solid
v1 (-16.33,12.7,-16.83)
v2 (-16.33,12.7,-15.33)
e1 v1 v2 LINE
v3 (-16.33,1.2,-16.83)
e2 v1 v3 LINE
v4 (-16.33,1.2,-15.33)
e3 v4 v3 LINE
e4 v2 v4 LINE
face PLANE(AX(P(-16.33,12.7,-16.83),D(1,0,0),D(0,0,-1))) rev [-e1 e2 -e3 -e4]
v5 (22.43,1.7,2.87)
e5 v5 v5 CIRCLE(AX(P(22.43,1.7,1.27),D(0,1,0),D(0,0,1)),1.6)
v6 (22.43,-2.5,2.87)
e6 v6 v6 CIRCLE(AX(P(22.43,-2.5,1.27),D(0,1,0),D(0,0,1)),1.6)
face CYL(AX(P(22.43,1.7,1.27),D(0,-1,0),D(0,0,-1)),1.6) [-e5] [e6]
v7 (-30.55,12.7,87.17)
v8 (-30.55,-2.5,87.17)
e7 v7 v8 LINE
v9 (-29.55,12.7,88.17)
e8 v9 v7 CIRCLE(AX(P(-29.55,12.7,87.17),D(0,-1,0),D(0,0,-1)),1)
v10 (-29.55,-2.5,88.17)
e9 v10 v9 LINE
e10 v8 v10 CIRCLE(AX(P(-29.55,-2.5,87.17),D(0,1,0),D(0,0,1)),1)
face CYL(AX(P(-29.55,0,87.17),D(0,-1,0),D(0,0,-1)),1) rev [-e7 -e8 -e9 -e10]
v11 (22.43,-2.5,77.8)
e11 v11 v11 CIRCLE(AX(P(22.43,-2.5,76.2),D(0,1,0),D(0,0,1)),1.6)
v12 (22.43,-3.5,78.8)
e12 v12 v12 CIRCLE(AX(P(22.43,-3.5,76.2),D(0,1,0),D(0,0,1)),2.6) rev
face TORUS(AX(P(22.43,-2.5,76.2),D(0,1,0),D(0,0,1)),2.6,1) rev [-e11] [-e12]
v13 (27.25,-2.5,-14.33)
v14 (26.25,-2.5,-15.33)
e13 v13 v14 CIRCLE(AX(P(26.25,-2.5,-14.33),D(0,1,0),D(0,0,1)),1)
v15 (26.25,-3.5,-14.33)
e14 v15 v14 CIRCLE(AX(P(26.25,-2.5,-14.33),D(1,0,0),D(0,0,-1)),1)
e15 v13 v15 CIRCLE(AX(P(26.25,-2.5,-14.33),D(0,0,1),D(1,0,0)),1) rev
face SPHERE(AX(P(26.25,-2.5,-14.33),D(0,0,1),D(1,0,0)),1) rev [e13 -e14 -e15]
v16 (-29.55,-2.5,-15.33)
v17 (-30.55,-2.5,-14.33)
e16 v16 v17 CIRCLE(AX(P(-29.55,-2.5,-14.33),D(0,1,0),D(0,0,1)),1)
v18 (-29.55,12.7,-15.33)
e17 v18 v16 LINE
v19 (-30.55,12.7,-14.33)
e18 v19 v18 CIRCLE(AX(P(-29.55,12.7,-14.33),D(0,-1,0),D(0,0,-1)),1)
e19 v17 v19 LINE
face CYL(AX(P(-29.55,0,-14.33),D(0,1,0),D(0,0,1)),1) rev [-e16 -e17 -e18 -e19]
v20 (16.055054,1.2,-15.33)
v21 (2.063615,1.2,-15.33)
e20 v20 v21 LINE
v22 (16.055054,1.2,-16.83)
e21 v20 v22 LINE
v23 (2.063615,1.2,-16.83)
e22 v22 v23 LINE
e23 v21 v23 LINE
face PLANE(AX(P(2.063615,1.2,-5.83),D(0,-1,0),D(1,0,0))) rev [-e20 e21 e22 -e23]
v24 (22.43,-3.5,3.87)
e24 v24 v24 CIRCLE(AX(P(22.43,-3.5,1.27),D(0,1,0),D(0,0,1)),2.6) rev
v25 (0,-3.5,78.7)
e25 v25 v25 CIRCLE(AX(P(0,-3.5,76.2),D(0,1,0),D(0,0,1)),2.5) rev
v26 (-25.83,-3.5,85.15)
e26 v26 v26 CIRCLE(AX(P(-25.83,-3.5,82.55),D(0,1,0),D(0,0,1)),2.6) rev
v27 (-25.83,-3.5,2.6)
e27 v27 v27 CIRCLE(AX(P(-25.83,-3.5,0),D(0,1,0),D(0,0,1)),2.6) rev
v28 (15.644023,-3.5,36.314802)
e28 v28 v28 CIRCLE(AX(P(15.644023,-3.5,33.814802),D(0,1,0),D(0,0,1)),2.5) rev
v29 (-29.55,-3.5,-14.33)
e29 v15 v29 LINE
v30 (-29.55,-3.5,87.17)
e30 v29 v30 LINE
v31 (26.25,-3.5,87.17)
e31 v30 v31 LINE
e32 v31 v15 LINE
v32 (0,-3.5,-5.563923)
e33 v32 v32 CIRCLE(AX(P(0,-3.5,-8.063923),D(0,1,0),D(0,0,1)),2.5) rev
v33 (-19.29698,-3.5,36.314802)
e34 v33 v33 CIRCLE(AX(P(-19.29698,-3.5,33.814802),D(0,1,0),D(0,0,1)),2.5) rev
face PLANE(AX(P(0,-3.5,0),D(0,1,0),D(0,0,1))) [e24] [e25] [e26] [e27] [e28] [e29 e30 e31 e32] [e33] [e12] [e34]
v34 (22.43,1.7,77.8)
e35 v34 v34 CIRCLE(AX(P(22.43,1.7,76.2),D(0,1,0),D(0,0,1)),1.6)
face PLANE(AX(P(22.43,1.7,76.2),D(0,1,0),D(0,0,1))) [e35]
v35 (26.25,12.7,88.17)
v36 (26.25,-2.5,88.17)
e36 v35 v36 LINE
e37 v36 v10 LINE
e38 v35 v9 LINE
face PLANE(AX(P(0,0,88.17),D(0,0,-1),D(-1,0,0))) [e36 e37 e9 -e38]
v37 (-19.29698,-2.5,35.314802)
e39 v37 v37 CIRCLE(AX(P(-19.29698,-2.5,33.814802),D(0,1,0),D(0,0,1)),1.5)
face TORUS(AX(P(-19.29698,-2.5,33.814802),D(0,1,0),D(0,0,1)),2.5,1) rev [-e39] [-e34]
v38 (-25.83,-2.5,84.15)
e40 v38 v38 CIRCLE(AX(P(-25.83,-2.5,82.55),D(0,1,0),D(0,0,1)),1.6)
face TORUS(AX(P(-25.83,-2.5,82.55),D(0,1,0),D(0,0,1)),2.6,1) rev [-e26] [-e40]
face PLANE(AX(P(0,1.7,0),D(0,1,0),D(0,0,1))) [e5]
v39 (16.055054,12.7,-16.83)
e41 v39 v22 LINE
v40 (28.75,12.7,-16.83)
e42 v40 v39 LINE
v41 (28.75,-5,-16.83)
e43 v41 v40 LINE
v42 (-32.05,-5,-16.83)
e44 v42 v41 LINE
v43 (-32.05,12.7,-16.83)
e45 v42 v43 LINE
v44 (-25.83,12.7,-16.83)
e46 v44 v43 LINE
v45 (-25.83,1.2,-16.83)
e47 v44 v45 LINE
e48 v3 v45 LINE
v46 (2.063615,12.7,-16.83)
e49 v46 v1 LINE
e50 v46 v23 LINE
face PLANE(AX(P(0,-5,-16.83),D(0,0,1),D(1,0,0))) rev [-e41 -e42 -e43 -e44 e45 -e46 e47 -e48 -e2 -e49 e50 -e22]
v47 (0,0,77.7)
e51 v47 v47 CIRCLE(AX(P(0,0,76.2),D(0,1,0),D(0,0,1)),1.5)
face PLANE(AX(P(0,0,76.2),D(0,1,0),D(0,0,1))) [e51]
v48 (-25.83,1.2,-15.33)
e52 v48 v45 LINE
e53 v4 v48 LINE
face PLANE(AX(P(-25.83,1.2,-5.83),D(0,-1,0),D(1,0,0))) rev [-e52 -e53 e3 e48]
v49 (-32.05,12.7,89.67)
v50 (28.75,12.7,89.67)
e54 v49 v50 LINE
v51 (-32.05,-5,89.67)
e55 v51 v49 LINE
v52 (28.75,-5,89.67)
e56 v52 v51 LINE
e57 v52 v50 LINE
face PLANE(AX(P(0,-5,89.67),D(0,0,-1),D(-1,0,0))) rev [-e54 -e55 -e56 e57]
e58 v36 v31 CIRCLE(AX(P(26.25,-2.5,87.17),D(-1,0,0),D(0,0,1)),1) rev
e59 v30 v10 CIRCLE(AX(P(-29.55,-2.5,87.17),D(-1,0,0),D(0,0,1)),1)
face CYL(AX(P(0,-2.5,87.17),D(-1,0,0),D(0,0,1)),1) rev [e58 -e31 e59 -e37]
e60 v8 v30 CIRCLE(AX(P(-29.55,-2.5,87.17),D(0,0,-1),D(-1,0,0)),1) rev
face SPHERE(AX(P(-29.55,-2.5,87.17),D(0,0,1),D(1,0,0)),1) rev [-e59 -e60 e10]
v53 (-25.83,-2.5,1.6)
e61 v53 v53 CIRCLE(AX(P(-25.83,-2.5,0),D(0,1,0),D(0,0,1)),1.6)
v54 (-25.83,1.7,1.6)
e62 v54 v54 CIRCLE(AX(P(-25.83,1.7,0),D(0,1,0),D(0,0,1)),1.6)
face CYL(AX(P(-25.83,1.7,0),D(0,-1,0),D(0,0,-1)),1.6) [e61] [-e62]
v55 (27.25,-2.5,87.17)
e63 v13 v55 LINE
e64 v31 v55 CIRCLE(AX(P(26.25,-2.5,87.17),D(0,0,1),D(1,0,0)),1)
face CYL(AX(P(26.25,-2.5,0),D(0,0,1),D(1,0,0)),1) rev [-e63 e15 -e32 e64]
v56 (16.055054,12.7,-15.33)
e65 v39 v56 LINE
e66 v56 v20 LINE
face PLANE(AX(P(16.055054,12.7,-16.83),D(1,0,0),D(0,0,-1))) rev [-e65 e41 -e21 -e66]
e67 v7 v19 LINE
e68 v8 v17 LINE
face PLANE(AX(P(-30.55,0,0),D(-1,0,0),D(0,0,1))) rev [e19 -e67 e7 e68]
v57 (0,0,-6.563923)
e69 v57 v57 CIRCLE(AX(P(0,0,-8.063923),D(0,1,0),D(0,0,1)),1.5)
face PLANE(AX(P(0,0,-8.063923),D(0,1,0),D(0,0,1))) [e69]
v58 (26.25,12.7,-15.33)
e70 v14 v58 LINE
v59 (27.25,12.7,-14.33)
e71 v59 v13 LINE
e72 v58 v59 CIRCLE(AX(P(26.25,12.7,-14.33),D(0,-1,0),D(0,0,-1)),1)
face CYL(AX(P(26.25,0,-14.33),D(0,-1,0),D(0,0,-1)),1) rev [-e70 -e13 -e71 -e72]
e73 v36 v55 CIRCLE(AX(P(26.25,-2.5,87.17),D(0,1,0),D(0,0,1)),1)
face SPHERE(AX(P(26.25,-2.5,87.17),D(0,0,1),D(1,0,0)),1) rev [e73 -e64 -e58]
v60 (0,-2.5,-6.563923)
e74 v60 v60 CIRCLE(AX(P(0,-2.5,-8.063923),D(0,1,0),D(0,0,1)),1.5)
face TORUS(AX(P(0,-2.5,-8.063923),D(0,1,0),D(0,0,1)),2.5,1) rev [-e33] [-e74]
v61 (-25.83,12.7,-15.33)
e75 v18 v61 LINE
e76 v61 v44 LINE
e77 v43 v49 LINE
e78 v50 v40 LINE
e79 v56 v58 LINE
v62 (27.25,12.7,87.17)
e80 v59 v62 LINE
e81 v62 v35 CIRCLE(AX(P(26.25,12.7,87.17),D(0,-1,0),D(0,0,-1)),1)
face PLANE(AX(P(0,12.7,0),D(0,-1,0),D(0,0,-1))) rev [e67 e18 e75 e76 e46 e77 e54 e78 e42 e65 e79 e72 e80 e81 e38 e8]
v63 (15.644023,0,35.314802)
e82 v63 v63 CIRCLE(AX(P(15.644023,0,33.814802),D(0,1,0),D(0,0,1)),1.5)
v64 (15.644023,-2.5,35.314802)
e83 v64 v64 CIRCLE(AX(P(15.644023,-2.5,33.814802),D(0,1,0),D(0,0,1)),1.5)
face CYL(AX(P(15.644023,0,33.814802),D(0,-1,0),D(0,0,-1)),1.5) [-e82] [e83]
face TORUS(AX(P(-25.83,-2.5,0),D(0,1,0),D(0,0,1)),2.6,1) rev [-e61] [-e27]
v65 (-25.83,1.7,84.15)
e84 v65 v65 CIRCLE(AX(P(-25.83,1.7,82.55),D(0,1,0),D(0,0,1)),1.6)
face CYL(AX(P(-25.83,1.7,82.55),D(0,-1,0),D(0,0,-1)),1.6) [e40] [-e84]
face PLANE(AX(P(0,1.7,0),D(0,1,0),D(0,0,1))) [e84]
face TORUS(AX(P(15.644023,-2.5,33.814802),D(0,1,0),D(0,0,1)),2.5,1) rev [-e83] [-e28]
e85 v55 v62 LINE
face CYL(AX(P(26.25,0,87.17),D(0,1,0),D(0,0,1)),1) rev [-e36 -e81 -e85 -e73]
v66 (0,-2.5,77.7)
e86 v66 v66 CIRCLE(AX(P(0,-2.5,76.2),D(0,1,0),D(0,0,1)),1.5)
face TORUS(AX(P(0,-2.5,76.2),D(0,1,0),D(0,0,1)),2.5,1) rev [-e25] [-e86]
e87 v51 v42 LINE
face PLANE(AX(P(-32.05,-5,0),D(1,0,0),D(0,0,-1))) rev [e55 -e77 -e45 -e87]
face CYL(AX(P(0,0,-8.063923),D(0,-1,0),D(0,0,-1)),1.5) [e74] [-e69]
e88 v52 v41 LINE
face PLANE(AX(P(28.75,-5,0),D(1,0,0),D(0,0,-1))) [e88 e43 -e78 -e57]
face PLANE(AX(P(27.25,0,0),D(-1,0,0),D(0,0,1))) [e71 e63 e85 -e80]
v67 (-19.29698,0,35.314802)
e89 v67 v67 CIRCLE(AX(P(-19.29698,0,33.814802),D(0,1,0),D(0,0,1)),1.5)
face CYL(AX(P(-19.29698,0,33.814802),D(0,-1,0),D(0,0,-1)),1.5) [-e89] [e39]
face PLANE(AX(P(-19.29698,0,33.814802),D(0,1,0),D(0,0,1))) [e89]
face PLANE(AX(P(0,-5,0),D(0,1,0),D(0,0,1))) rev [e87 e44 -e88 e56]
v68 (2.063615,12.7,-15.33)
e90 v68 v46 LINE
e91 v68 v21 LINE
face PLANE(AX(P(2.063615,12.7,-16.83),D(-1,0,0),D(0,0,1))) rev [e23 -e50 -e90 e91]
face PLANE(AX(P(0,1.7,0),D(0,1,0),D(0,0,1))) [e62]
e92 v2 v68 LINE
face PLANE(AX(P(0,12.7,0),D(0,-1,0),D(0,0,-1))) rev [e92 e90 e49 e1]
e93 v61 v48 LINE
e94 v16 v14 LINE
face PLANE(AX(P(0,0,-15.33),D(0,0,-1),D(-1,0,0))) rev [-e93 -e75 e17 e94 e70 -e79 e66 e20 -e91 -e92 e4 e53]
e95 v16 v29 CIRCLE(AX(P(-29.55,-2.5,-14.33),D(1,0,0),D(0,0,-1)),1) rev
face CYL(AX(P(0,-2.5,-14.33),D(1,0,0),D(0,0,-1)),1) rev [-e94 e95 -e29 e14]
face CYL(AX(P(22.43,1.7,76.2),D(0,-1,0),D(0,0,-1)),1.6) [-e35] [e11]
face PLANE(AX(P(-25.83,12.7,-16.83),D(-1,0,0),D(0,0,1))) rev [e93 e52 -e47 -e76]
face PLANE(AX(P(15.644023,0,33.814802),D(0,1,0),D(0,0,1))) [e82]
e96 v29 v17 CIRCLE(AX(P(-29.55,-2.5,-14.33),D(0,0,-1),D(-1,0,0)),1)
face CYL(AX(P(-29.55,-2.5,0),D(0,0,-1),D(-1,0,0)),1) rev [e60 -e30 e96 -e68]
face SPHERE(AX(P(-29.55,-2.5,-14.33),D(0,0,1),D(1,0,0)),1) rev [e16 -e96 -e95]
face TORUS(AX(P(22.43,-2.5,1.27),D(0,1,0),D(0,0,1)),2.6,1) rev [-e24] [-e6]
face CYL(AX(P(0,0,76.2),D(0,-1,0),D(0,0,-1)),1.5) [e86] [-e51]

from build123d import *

# Parameters (mm, degrees)
BOSS_EXTRUDE1_START = -3.5
SKETCH1_W           = 60.8
SKETCH1_H           = 106.5
BOSS_EXTRUDE1_DEPTH = 1.5
BOSS_EXTRUDE2_START = -3.5
BOSS_EXTRUDE2_DEPTH = 3.5
BOSS_EXTRUDE3_DEPTH = 1.7
SKETCH2_R           = 1.5
BOSS_EXTRUDE4_DEPTH = 3.5
BOSS_EXTRUDE5_START = -3.5
SKETCH1_7_R         = 1.6
BOSS_EXTRUDE5_DEPTH = 5.2
FILLET5_R           = 1
SKETCH3_W           = 18.393615341
SKETCH3_H           = 1.5
BOSS_EXTRUDE6_DEPTH = 11
SKETCH4_W           = 13.991439111
SKETCH4_H           = 0.5
SKETCH4_W_2         = 9.5
CUT_EXTRUDE1_DEPTH  = 11
FILLET6_R           = 1


with BuildPart() as part:
    # Sketch1 → Boss-Extrude1 (new body)
    with BuildSketch(Plane(origin=(0, 0, 0), x_dir=(1, 0, 0), z_dir=(0, 1, 0)).offset(BOSS_EXTRUDE1_START)):
        with Locations((-1.65, -36.42)):
            Rectangle(SKETCH1_W, SKETCH1_H)
    extrude(amount=-BOSS_EXTRUDE1_DEPTH)



with BuildPart() as body_2:
    # Sketch1<3> → Boss-Extrude2 (new body)
    with BuildSketch(Plane(origin=(0, 0, 0), x_dir=(1, 0, 0), z_dir=(0, 1, 0)).offset(BOSS_EXTRUDE2_START)):
        Polygon((-32.05, 16.83), (28.75, 16.83), (28.75, -89.67), (-2.2, -89.67), (-32.05, -89.67), align=None)
        Polygon((-30.55, -88.17), (-30.55, 15.33), (27.25, 15.33), (27.25, -88.17), (-2.2, -88.17), align=None, mode=Mode.SUBTRACT)
    extrude(amount=BOSS_EXTRUDE2_DEPTH)

    # Sketch1<5> → Boss-Extrude3 (add)
    with BuildSketch(Plane(origin=(0, 0, 0), x_dir=(1, 0, 0), z_dir=(0, 1, 0))):
        Polygon((-32.05, 16.83), (28.75, 16.83), (28.75, -89.67), (-2.2, -89.67), (-32.05, -89.67), align=None)
        Polygon((-30.55, -88.17), (-30.55, 15.33), (27.25, 15.33), (27.25, -88.17), (-2.2, -88.17), align=None, mode=Mode.SUBTRACT)
    extrude(amount=BOSS_EXTRUDE3_DEPTH)


with BuildPart() as part_1:
    add(part.part)

    add(body_2.part)  # Boss-Extrude4 merges body 2
    # Sketch2 → Boss-Extrude4 (add)
    with BuildSketch(Plane(origin=(0, -3.5, 0), x_dir=(1, 0, 0), z_dir=(0, 1, 0))):
        with Locations(Location((0, -76.2, 0), (0, 0, 270))):
            Circle(SKETCH2_R)
        with Locations(Location((-19.296980253, -33.814802094, 0), (0, 0, 270))):
            Circle(SKETCH2_R)
        with Locations(Location((15.644023456, -33.814802094, 0), (0, 0, 270))):
            Circle(SKETCH2_R)
        with Locations(Location((0, 8.063923473, 0), (0, 0, 270))):
            Circle(SKETCH2_R)
    extrude(amount=BOSS_EXTRUDE4_DEPTH)

    # Sketch1<7> → Boss-Extrude5 (add)
    with BuildSketch(Plane(origin=(0, 0, 0), x_dir=(1, 0, 0), z_dir=(0, 1, 0)).offset(BOSS_EXTRUDE5_START)):
        with Locations(Location((-25.83, 0, 0), (0, 0, 270))):
            Circle(SKETCH1_7_R)
        with Locations(Location((22.43, -1.27, 0), (0, 0, 270))):
            Circle(SKETCH1_7_R)
        with Locations(Location((-25.83, -82.55, 0), (0, 0, 270))):
            Circle(SKETCH1_7_R)
        with Locations(Location((22.43, -76.2, 0), (0, 0, 270))):
            Circle(SKETCH1_7_R)
    extrude(amount=BOSS_EXTRUDE5_DEPTH)

    # Fillet5
    fillet5_edges = [part_1.edges().sort_by_distance(p)[0] for p in [
        (0, -3.5, 74.7),
        (-30.55, -3.5, 36.42),
        (-1.65, -3.5, -15.33),
        (-1.65, -3.5, 88.17),
        (27.25, -3.5, 36.42),
        (-19.296980253, -3.5, 32.314802094),
        (15.644023456, -3.5, 32.314802094),
        (0, -3.5, -9.563923473),
        (-25.83, -3.5, -1.6),
        (22.43, -3.5, -0.33),
        (-25.83, -3.5, 80.95),
        (22.43, -3.5, 74.6),
    ]]
    fillet(fillet5_edges, radius=FILLET5_R)

    # Sketch3 → Boss-Extrude6 (add)
    with BuildSketch(Plane(origin=(0, 1.7, 0), x_dir=(1, 0, 0), z_dir=(0, 1, 0))):
        Polygon((-25.83, 16.83), (-32.05, 16.83), (-32.05, -89.67), (28.75, -89.67), (28.75, 16.83), (16.055054452, 16.83), (16.055054452, 15.33), (27.25, 15.33), (27.25, -88.17), (-30.55, -88.17), (-30.55, 15.33), (-25.83, 15.33), align=None)
        with Locations((-7.13319233, 16.08)):
            Rectangle(SKETCH3_W, SKETCH3_H)
    extrude(amount=BOSS_EXTRUDE6_DEPTH)

    # Sketch4 → Cut-Extrude1 (cut)
    with BuildSketch(Plane(origin=(0, 0, -16.83), x_dir=(-1, 0, 0), z_dir=(0, 0, -1))):
        with Locations((-9.059334897, 1.45)):
            Rectangle(SKETCH4_W, SKETCH4_H)
        with Locations((21.08, 1.45)):
            Rectangle(SKETCH4_W_2, SKETCH4_H)
    extrude(amount=-CUT_EXTRUDE1_DEPTH, mode=Mode.SUBTRACT)

    # Fillet6
    # the kernel refuses this fillet: 1 mm, written as the material it adds along each edge
    with BuildSketch(Plane(origin=(-29.55, -2.5, 87.17), x_dir=(-1, 0, 0), z_dir=(0, 0, 1))) as fillet6_piece_1_section:
        Polygon((0, 0), (FILLET6_R, 0), (FILLET6_R, FILLET6_R), (0, FILLET6_R), align=None)
    fillet6_piece_1 = extrude(amount=FILLET6_R, mode=Mode.PRIVATE)
    fillet6_piece_1 = fillet6_piece_1 - Plane(origin=(-29.55, -2.5, 87.17), x_dir=(0.7071067811865475, 0.7071067811865475, 0), z_dir=(0, 0, 1)) * Sphere(FILLET6_R, mode=Mode.PRIVATE)
    add(fillet6_piece_1)
    with BuildSketch(Plane(origin=(-29.55, -2.5, -14.33), x_dir=(-1, 0, 0), z_dir=(0, 0, -1))) as fillet6_piece_2_section:
        Polygon((0, 0), (FILLET6_R, 0), (FILLET6_R, -FILLET6_R), (0, -FILLET6_R), align=None)
    fillet6_piece_2 = extrude(amount=FILLET6_R, mode=Mode.PRIVATE)
    fillet6_piece_2 = fillet6_piece_2 - Plane(origin=(-29.55, -2.5, -14.33), x_dir=(0.7071067811865475, 0.7071067811865475, 0), z_dir=(0, 0, -1)) * Sphere(FILLET6_R, mode=Mode.PRIVATE)
    add(fillet6_piece_2)
    with BuildSketch(Plane(origin=(26.25, -2.5, 87.17), x_dir=(1, 0, 0), z_dir=(0, 0, 1))) as fillet6_piece_3_section:
        Polygon((0, 0), (FILLET6_R, 0), (FILLET6_R, -FILLET6_R), (0, -FILLET6_R), align=None)
    fillet6_piece_3 = extrude(amount=FILLET6_R, mode=Mode.PRIVATE)
    fillet6_piece_3 = fillet6_piece_3 - Plane(origin=(26.25, -2.5, 87.17), x_dir=(-0.7071067811865475, 0.7071067811865475, 0), z_dir=(0, 0, 1)) * Sphere(FILLET6_R, mode=Mode.PRIVATE)
    add(fillet6_piece_3)
    with BuildSketch(Plane(origin=(26.25, -2.5, -14.33), x_dir=(1, 0, 0), z_dir=(0, 0, -1))) as fillet6_piece_4_section:
        Polygon((0, 0), (FILLET6_R, 0), (FILLET6_R, FILLET6_R), (0, FILLET6_R), align=None)
    fillet6_piece_4 = extrude(amount=FILLET6_R, mode=Mode.PRIVATE)
    fillet6_piece_4 = fillet6_piece_4 - Plane(origin=(26.25, -2.5, -14.33), x_dir=(-0.7071067811865475, 0.7071067811865475, 0), z_dir=(0, 0, -1)) * Sphere(FILLET6_R, mode=Mode.PRIVATE)
    add(fillet6_piece_4)
    with BuildSketch(Plane(origin=(-30.55, -2.5, 88.17), x_dir=(1, 0, 0), z_dir=(0, 1, 0)), Plane(origin=(27.25, 12.7, 88.17), x_dir=(-1, 0, 0), z_dir=(0, -1, 0))) as fillet6_piece_5:
        with BuildLine():
            CenterArc((FILLET6_R, FILLET6_R), FILLET6_R, 180, 90)
            Line((0, FILLET6_R), (0, 0))
            Line((0, 0), (FILLET6_R, 0))
        make_face()
    extrude(amount=15.2)
    with BuildSketch(Plane(origin=(-30.55, -2.5, -15.33), x_dir=(1, 0, 0), z_dir=(0, 1, 0)), Plane(origin=(27.25, 12.7, -15.33), x_dir=(-1, 0, 0), z_dir=(0, -1, 0))) as fillet6_piece_6:
        with BuildLine():
            CenterArc((FILLET6_R, -FILLET6_R), FILLET6_R, 90, 90)
            Line((0, -FILLET6_R), (0, 0))
            Line((0, 0), (FILLET6_R, 0))
        make_face()
    extrude(amount=15.2)


solid = part_1.part
